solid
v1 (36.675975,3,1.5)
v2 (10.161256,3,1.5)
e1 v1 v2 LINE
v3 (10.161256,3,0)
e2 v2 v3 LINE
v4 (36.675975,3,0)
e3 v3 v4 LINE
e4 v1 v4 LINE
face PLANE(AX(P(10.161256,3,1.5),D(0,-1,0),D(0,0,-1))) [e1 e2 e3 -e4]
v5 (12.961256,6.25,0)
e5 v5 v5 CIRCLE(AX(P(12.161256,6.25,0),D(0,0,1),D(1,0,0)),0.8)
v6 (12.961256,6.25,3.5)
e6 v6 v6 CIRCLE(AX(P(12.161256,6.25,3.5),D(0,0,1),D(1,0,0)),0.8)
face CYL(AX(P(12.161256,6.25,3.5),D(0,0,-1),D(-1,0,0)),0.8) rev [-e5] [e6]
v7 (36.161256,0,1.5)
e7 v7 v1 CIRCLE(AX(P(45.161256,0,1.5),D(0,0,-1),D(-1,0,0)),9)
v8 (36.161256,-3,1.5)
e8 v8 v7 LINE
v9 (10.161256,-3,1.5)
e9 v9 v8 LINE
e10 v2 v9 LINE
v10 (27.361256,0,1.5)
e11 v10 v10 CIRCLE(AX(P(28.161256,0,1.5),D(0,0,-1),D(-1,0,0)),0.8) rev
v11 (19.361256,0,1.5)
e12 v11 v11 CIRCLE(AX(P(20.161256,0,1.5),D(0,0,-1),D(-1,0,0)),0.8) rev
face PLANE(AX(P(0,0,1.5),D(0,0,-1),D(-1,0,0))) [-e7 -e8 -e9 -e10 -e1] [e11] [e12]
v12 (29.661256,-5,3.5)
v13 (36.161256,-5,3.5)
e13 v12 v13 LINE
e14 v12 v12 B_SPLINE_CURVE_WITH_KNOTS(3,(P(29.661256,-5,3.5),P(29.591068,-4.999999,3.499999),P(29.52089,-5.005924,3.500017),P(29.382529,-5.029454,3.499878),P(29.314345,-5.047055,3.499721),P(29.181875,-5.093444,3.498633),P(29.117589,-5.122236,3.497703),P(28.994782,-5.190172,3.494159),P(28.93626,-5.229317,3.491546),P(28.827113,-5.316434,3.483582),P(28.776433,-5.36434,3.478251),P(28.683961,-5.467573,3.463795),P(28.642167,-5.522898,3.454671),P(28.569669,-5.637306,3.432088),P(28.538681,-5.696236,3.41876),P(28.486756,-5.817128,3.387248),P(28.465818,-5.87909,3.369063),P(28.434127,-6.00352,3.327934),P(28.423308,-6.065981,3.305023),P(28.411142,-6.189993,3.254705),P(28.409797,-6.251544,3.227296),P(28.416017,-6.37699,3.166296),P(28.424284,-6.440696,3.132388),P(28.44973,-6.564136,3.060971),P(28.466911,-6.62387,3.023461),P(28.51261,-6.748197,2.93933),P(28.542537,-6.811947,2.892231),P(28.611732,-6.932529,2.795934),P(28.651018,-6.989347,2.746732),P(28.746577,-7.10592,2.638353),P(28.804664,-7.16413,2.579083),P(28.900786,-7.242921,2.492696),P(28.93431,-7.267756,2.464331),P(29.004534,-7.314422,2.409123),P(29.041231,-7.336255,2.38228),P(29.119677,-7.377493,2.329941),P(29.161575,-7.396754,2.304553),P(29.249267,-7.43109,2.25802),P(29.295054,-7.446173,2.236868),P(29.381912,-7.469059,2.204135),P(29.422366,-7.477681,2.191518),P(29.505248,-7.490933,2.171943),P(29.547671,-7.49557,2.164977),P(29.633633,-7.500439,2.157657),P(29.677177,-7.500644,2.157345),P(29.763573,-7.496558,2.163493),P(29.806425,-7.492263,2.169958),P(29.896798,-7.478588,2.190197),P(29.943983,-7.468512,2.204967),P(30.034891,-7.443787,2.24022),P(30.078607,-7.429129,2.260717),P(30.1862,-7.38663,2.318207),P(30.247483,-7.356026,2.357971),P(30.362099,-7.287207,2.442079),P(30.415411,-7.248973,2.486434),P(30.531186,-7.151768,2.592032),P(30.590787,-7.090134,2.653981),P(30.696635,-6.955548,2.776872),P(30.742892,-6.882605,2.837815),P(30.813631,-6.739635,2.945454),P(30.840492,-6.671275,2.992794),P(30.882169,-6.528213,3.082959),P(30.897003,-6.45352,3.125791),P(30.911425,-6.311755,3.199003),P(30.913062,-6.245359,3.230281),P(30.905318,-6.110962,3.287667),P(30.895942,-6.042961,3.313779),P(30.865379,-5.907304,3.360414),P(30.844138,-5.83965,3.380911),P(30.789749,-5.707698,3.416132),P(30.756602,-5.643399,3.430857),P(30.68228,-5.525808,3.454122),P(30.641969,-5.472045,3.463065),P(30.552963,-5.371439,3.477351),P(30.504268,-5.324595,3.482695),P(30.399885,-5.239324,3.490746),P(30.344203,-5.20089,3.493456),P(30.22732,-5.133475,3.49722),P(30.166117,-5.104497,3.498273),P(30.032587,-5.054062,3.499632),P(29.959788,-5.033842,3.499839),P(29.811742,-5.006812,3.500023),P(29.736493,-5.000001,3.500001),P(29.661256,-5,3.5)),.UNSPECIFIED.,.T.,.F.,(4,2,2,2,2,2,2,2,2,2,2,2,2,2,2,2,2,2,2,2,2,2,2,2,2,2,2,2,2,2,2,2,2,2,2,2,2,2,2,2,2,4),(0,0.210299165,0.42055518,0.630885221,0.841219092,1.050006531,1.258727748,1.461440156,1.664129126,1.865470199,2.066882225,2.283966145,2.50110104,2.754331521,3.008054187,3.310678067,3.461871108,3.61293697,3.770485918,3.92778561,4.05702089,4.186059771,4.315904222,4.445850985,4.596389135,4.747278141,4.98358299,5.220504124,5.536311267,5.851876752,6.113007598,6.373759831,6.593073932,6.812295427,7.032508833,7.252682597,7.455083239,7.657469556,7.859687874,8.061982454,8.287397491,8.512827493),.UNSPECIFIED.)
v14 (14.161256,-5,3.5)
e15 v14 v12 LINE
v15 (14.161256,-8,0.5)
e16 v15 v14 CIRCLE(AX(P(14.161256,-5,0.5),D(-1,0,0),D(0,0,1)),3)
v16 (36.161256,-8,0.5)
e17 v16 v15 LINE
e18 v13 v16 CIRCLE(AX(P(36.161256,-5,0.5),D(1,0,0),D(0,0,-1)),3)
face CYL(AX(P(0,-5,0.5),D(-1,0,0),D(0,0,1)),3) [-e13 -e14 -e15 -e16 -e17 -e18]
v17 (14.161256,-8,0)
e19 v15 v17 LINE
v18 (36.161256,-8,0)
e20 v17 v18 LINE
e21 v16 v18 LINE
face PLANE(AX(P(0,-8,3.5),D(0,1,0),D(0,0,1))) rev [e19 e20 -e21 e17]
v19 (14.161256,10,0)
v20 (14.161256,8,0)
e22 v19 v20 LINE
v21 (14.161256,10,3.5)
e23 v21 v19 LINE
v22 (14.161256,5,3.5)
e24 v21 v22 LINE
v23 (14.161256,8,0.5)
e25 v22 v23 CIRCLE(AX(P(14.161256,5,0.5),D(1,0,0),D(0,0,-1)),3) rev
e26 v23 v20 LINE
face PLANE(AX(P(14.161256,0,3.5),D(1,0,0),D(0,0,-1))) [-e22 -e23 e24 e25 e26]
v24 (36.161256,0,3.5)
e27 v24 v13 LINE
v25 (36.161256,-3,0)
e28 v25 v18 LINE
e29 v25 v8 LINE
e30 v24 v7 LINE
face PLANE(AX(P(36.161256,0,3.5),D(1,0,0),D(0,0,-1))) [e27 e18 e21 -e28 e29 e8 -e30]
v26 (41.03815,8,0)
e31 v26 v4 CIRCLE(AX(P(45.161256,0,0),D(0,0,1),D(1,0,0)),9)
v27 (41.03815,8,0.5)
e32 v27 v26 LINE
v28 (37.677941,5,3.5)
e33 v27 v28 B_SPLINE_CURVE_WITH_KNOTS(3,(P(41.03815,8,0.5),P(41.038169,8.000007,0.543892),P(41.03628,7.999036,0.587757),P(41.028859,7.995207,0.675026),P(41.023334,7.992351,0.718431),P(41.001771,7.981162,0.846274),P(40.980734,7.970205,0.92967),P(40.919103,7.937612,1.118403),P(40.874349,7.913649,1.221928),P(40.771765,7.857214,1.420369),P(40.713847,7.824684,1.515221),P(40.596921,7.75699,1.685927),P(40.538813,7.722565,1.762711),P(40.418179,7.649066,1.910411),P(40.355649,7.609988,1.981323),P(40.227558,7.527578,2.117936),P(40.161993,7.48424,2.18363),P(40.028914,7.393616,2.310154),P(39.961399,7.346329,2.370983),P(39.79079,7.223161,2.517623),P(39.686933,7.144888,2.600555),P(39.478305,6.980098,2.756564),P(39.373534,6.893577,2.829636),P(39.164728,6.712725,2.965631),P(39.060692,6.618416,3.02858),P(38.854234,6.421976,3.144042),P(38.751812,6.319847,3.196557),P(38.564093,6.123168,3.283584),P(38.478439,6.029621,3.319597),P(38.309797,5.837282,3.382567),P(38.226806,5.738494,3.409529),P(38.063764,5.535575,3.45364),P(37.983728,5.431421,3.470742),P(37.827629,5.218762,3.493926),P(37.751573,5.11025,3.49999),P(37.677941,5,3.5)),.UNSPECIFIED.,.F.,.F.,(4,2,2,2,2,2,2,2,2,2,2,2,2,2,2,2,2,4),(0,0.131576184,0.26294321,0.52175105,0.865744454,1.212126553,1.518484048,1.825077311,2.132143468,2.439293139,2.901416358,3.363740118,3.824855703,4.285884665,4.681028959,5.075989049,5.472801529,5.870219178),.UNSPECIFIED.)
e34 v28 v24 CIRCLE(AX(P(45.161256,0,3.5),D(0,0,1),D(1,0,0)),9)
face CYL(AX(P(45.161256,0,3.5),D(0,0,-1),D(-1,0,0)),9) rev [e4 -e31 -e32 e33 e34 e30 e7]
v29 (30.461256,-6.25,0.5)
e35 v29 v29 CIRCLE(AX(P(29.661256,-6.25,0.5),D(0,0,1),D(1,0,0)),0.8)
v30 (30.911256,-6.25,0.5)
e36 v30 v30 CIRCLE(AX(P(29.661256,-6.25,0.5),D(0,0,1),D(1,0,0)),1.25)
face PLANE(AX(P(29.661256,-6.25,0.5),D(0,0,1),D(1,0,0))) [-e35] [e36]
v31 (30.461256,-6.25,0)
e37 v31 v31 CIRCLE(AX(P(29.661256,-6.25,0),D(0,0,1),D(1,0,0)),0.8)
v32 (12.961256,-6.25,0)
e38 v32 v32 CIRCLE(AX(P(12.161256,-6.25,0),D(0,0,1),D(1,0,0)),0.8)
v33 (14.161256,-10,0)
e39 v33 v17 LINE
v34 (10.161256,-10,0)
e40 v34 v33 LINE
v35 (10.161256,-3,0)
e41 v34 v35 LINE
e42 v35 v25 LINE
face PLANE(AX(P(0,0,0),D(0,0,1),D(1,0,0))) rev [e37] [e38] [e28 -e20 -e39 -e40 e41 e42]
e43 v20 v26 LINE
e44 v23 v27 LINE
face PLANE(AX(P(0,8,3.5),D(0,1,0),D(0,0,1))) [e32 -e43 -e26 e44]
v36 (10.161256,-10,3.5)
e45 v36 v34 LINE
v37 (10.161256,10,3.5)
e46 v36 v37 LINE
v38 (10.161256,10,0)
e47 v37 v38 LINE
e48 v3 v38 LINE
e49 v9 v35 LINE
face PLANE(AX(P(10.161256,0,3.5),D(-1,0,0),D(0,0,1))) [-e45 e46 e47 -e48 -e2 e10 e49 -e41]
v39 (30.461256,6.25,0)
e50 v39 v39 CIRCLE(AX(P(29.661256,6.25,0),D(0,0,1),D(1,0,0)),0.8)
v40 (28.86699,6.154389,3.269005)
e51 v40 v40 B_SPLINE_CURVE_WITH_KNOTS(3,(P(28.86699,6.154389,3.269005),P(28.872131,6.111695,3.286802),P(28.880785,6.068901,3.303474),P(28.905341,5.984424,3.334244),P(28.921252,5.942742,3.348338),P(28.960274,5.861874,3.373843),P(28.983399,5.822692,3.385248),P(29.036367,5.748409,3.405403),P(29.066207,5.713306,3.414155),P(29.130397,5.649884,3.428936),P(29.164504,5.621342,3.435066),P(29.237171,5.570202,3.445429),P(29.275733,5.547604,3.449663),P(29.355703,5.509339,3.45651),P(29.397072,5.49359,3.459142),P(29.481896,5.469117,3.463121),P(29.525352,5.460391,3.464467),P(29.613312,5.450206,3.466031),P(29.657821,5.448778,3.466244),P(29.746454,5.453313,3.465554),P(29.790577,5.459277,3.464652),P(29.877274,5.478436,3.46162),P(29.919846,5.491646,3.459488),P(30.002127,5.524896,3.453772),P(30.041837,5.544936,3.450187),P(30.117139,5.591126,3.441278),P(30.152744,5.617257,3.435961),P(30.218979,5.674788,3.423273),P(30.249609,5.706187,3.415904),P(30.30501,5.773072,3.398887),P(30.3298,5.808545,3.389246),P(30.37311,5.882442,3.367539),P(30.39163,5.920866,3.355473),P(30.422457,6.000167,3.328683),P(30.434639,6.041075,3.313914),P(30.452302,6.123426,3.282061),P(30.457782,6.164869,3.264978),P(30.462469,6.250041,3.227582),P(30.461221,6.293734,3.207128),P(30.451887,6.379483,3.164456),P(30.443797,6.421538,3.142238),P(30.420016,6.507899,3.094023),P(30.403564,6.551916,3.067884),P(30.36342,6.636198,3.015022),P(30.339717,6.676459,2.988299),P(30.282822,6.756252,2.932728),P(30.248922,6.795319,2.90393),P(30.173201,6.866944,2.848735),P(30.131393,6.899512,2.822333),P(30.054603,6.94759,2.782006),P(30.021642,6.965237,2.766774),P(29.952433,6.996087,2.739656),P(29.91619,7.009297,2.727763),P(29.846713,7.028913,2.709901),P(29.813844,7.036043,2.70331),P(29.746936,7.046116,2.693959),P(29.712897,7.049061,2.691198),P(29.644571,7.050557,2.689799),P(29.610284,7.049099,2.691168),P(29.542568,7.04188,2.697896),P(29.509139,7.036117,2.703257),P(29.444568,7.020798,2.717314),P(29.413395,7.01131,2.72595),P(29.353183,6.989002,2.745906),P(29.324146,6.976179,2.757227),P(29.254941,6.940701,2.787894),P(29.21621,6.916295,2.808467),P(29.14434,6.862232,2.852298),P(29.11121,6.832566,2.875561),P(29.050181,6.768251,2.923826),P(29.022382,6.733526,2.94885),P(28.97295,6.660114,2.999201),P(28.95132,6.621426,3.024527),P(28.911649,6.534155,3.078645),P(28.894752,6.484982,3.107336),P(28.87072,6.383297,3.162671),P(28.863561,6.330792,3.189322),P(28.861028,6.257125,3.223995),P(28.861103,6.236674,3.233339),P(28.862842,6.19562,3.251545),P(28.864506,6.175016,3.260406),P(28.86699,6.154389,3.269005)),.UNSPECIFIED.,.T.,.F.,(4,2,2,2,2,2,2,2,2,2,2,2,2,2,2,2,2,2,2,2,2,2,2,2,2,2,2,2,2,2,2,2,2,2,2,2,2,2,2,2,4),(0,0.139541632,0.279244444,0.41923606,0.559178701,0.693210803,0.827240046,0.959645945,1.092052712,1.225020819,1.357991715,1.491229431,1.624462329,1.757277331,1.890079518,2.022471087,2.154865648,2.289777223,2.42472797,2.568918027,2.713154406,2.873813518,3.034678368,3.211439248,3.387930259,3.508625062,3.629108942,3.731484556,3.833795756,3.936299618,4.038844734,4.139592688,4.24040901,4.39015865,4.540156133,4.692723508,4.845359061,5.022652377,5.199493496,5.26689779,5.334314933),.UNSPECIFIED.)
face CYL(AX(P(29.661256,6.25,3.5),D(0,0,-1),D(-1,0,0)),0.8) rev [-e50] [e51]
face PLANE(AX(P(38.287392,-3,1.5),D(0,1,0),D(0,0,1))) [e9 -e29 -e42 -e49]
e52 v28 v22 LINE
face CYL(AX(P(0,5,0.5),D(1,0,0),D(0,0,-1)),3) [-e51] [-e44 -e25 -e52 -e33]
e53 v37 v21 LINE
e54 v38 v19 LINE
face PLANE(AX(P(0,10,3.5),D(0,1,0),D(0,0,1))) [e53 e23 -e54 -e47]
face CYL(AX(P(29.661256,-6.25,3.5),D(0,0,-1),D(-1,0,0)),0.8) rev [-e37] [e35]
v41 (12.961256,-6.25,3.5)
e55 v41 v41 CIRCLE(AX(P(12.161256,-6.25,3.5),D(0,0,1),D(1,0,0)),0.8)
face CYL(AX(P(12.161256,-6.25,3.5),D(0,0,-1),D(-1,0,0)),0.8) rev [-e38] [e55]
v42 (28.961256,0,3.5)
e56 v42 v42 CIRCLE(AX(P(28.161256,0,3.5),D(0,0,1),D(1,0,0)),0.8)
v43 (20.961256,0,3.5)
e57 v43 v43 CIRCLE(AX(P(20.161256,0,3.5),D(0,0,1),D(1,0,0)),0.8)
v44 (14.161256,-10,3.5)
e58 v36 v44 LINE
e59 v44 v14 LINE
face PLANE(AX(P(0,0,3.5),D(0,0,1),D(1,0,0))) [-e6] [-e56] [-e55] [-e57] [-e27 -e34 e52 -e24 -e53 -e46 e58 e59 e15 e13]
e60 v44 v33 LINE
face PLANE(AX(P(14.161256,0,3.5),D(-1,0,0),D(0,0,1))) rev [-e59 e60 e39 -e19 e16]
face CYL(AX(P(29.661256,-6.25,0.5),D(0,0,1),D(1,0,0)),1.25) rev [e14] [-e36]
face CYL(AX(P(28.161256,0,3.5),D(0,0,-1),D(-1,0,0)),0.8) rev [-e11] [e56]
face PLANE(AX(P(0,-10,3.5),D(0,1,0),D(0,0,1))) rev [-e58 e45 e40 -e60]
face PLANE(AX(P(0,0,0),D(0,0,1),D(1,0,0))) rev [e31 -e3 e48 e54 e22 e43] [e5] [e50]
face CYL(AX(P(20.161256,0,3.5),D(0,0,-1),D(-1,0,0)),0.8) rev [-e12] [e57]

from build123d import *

# Parameters (mm, degrees)
SKETCH1_W           = 4
SKETCH1_H           = 2
BOSS_EXTRUDE1_DEPTH = 3.5
WIRE_CANAL_DEPTH    = 1.5
SKETCH2_R           = 0.8
SCREW_HOLES_DEPTH   = 43.383720665
FILLET1_START       = 14.161255893
FILLET1_DEPTH       = 27.838744107
CUT_EXTRUDE1_START  = 3.5
SKETCH4_R           = 1.25
CUT_EXTRUDE1_DEPTH  = 3


with BuildPart() as part:
    # Sketch1 → Boss-Extrude1 (new body)
    with BuildSketch(Plane.XY):
        with BuildLine():
            Line((10.161255893, 0), (36.161255894, 0))
            ThreePointArc((36.161255894, 0), (37.476597455, 4.684658438), (41.038150268, 8))
            Line((41.038150268, 8), (14.161255893, 8))
            Line((14.161255893, 8), (10.161255893, 8))
            Line((10.161255893, 8), (10.161255893, 0))
        make_face()
        Polygon((36.161255894, -8), (36.161255894, 0), (10.161255893, 0), (10.161255893, -8), (14.161255893, -8), align=None)
        with Locations((12.161255893, 9)):
            Rectangle(SKETCH1_W, SKETCH1_H)
        with Locations((12.161255893, -9)):
            Rectangle(SKETCH1_W, SKETCH1_H)
    extrude(amount=BOSS_EXTRUDE1_DEPTH)

    # Sketch3 → Wire Canal (cut)
    with BuildSketch(Plane.XY):
        Polygon((10.161255893, 3), (10.161255893, 0), (10.161255893, -3), (38.287392351, -3), (38.287392351, 3), align=None)
    extrude(amount=WIRE_CANAL_DEPTH, mode=Mode.SUBTRACT)

    # Sketch2 → Screw Holes (cut, through all)
    with BuildSketch(Plane.XY):
        with Locations(Location((20.161255894, 0, 0), (0, 0, 180))):
            Circle(SKETCH2_R)
        with Locations((12.161255894, -6.25)):
            Circle(SKETCH2_R)
        with Locations((29.661255894, 6.25)):
            Circle(SKETCH2_R)
        with Locations((29.661255894, -6.25)):
            Circle(SKETCH2_R)
        with Locations((12.161255894, 6.25)):
            Circle(SKETCH2_R)
        with Locations(Location((28.161255894, 0, 0), (0, 0, 180))):
            Circle(SKETCH2_R)
    extrude(amount=SCREW_HOLES_DEPTH, mode=Mode.SUBTRACT)

    # Fillet1: read off the stored shape, not the designer's step
    # Fillet1 outline → Fillet1 (cut)
    with BuildSketch(Plane.YZ.offset(FILLET1_START)):
        with BuildLine():
            Line((-8, 3.5), (-8, 0.5))
            ThreePointArc((-8, 0.5), (-7.121320344, 2.621320344), (-5, 3.5))
            Line((-5, 3.5), (-8, 3.5))
        make_face()
        with BuildLine():
            Line((8, 3.5), (5, 3.5))
            ThreePointArc((5, 3.5), (7.121320344, 2.621320344), (8, 0.5))
            Line((8, 0.5), (8, 3.5))
        make_face()
    extrude(amount=FILLET1_DEPTH, mode=Mode.SUBTRACT)

    # Sketch4 → Cut-Extrude1 (cut)
    with BuildSketch(Plane.XY.offset(CUT_EXTRUDE1_START)):
        with Locations((29.661255894, -6.25)):
            Circle(SKETCH4_R)
    extrude(amount=-CUT_EXTRUDE1_DEPTH, mode=Mode.SUBTRACT)


solid = part.part
